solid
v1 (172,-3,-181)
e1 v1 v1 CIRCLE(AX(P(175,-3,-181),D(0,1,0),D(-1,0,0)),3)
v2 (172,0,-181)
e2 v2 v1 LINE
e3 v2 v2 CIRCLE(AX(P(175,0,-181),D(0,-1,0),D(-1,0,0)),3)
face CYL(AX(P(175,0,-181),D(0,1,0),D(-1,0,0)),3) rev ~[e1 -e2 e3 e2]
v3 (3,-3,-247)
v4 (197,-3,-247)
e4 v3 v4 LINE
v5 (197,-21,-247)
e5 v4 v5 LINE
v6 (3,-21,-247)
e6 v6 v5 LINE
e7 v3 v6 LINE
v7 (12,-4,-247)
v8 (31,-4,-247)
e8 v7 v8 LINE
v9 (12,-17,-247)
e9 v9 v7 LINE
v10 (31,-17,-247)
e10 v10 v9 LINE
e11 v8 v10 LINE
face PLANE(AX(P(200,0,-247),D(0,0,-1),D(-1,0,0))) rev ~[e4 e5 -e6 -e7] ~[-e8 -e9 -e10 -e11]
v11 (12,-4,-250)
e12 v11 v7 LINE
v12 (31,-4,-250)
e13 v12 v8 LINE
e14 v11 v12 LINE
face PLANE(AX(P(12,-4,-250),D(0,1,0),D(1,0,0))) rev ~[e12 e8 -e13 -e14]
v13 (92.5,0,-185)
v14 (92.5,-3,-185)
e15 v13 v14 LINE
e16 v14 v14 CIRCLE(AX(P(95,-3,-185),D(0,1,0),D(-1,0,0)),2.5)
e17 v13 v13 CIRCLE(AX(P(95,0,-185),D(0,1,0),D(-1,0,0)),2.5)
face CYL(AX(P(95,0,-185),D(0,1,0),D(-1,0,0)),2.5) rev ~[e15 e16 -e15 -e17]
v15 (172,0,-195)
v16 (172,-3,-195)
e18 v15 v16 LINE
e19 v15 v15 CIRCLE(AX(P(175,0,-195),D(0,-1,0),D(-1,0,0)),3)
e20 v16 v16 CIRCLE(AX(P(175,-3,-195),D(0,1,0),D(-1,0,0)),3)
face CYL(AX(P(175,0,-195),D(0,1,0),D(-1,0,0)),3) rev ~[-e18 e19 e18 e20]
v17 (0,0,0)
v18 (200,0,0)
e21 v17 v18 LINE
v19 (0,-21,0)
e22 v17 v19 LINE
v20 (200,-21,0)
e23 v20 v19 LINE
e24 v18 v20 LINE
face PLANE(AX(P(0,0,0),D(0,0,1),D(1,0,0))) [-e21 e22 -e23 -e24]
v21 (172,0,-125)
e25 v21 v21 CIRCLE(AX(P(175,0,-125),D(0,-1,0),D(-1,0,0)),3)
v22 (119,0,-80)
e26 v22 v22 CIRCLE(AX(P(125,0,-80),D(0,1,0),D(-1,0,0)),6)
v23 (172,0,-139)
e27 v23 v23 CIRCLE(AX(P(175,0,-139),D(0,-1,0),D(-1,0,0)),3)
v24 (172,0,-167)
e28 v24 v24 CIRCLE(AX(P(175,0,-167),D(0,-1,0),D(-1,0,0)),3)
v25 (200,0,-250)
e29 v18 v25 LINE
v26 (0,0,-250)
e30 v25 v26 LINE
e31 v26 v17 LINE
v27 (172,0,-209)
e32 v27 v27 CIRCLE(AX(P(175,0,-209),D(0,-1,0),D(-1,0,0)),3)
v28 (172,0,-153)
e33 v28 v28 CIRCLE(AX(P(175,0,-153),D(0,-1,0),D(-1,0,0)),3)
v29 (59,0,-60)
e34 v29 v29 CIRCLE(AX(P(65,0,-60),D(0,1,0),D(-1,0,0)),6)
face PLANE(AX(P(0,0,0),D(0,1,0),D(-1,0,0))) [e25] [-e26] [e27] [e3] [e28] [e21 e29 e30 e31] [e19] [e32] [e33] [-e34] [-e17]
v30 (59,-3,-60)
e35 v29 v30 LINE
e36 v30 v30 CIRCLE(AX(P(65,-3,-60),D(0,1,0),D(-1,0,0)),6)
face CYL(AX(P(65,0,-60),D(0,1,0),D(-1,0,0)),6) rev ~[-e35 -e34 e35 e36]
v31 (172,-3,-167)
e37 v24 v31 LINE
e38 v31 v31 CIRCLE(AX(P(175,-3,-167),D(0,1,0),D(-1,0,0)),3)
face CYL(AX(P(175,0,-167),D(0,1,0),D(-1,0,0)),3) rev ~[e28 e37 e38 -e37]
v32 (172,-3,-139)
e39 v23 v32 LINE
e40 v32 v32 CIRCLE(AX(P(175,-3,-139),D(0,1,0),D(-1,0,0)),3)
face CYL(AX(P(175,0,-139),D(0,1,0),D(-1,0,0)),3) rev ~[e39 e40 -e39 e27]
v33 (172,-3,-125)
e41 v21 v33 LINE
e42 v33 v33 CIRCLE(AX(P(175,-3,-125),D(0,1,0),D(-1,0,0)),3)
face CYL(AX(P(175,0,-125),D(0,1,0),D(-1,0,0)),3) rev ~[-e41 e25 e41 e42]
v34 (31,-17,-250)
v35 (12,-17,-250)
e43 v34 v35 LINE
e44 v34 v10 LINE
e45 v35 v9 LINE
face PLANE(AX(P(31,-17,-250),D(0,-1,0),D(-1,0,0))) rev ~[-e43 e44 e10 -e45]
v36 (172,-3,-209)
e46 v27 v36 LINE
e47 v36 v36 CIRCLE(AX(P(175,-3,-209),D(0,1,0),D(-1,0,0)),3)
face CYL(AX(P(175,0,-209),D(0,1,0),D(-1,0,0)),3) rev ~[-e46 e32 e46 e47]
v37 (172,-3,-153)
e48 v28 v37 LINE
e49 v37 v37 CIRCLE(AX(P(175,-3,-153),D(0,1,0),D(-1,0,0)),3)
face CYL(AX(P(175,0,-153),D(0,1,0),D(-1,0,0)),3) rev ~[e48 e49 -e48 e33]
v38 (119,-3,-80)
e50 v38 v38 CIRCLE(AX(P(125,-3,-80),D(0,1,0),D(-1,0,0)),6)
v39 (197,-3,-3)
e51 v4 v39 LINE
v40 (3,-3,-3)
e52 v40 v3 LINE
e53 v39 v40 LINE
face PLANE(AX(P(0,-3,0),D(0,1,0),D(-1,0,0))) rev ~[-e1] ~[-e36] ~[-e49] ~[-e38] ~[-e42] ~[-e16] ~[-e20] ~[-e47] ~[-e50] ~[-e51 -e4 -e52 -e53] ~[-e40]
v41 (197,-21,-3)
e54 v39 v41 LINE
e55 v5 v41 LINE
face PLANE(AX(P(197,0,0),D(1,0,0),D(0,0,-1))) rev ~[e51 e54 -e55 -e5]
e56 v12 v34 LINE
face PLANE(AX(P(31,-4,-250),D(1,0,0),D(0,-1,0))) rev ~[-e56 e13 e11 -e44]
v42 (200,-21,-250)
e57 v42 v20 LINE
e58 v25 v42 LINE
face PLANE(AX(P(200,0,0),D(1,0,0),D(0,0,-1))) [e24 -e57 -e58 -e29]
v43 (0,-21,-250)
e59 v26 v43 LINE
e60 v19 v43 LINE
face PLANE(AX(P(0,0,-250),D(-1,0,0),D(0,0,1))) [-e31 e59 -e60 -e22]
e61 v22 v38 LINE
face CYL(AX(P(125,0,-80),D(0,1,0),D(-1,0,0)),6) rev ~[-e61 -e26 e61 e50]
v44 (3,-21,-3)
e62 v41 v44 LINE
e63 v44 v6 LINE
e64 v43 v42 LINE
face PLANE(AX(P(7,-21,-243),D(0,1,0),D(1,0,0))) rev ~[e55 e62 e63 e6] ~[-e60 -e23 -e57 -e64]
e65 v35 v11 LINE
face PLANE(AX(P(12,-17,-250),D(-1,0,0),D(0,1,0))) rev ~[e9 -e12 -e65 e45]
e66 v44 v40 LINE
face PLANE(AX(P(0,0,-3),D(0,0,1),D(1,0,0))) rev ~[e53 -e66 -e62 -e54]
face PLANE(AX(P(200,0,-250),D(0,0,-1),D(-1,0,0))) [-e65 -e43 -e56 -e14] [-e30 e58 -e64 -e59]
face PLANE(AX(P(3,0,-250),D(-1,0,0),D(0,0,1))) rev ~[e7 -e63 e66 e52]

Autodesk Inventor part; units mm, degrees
ref_plane "YZ Plane" through (0, 0, 0) normal (1, 0, 0) x (0, 1, 0)
ref_plane "XZ Plane" through (0, 0, 0) normal (0, 1, 0) x (-1, 0, 0)
ref_plane "XY Plane" through (0, 0, 0) normal (0, 0, 1) x (1, 0, 0)
sketch "block" plane through (0, 0, 0) normal (0, 1, 0) x (-1, 0, 0)
  line L0 (0, 0) -> (-200, 0)
  line L1 (-200, 0) -> (-200, -250)
  line L2 (-200, -250) -> (0, -250)
  line L3 (0, -250) -> (0, 0)
  dimension "d31" = 200
  dimension "d32" = 250
extrude "ext_block" add sketch "block" against normal blind 24
shell "Shell2" thickness 3 removed faces 0
sketch "lines_base" plane through (0, 0, 0) normal (0, 1, 0) x (-1, 0, 0)
  line L0 (0, 0) -> (-200, 0)
  line L1 (-200, 0) -> (-200, -250)
  line L2 (-200, -250) -> (0, -250)
  line L3 (0, -250) -> (0, 0)
  circle A0 centre (-65, -60) radius 6
  circle A1 centre (-125, -80) radius 6
  circle A2 centre (-65, -60) radius 12.5
  circle A3 centre (-65, -60) radius 8.5
  circle A4 centre (-125, -80) radius 8.5
  circle A5 centre (-125, -80) radius 12.5
  circle A6 centre (-175, -125) radius 3
  line L4 (-175, -125) -> (-175, -209)
  line L5 (-175, -125) -> (-91, -125) construction
  circle A7 centre (-175, -139) radius 3
  circle A8 centre (-175, -153) radius 3
  circle A9 centre (-175, -167) radius 3
  circle A10 centre (-175, -181) radius 3
  circle A11 centre (-175, -195) radius 3
  circle A12 centre (-175, -209) radius 3
  circle A13 centre (-95, -185) radius 2.5
  circle A14 centre (-95, -185) radius 5
  point P0 (-200, -125)
  dimension "d0" = 200
  dimension "d1" = 250
  dimension "d2" = 12
  dimension "d3" = 12
  dimension "d4" = 25
  dimension "d5" = 17
  dimension "d6" = 17
  dimension "d7" = 25
  dimension "d8" = 75
  dimension "d9" = 80
  dimension "d10" = 65
  dimension "d11" = 60
  dimension "d12" = 6
  dimension "d13" = 84
  dimension "d14" = 90
  dimension "d15" = 25
  dimension "d16" = 125
  dimension "d19" = 14
  dimension "d24" = 5
  dimension "d25" = 10
  dimension "d26" = 65
  dimension "d27" = 95
extrude "holes" cut sketch "lines_base" against normal up to surface (3 mm away) contours A0 | A1 | A6 | A7 L4 | L4 A7 | A8 L4 | L4 A8 | A9 L4 | L4 A9 | A10 L4 | L4 A10 | A11 L4 | L4 A11 | A12 | A13
sketch "Sketch4" plane through (200, 0, -250) normal (0, 0, -1) x (-1, 0, 0)
  line L0 (188, -4) -> (169, -4)
  line L1 (169, -4) -> (169, -17)
  line L2 (169, -17) -> (188, -17)
  line L3 (188, -17) -> (188, -4)
  line L4 (0, 0) -> (200, 0) projected
  line L5 (200, 0) -> (200, -24) projected
  dimension "d40" = 19
  dimension "d41" = 13
  dimension "d42" = 4
  dimension "d43" = 12
extrude "pwr_button_hole" cut sketch "Sketch4" against normal up to surface (3 mm away)
ref_plane "Work Plane1" through (7, -21, -243) normal (0, 1, 0) x (1, 0, 0)
sketch "Sketch5" plane through (7, -21, -243) normal (0, 1, 0) x (1, 0, 0)
  line L0 (-20.9366, 21.7948) -> (229.9216, 21.7948)
  line L1 (229.9216, 21.7948) -> (229.9216, -260.9184)
  line L2 (229.9216, -260.9184) -> (-20.9366, -260.9184)
  line L3 (-20.9366, -260.9184) -> (-20.9366, 21.7948)
  point P0 (-7, -243)
extrude "back_cover_cut" cut sketch "Sketch5" against normal through all
properties part number "back" material "Glass"
